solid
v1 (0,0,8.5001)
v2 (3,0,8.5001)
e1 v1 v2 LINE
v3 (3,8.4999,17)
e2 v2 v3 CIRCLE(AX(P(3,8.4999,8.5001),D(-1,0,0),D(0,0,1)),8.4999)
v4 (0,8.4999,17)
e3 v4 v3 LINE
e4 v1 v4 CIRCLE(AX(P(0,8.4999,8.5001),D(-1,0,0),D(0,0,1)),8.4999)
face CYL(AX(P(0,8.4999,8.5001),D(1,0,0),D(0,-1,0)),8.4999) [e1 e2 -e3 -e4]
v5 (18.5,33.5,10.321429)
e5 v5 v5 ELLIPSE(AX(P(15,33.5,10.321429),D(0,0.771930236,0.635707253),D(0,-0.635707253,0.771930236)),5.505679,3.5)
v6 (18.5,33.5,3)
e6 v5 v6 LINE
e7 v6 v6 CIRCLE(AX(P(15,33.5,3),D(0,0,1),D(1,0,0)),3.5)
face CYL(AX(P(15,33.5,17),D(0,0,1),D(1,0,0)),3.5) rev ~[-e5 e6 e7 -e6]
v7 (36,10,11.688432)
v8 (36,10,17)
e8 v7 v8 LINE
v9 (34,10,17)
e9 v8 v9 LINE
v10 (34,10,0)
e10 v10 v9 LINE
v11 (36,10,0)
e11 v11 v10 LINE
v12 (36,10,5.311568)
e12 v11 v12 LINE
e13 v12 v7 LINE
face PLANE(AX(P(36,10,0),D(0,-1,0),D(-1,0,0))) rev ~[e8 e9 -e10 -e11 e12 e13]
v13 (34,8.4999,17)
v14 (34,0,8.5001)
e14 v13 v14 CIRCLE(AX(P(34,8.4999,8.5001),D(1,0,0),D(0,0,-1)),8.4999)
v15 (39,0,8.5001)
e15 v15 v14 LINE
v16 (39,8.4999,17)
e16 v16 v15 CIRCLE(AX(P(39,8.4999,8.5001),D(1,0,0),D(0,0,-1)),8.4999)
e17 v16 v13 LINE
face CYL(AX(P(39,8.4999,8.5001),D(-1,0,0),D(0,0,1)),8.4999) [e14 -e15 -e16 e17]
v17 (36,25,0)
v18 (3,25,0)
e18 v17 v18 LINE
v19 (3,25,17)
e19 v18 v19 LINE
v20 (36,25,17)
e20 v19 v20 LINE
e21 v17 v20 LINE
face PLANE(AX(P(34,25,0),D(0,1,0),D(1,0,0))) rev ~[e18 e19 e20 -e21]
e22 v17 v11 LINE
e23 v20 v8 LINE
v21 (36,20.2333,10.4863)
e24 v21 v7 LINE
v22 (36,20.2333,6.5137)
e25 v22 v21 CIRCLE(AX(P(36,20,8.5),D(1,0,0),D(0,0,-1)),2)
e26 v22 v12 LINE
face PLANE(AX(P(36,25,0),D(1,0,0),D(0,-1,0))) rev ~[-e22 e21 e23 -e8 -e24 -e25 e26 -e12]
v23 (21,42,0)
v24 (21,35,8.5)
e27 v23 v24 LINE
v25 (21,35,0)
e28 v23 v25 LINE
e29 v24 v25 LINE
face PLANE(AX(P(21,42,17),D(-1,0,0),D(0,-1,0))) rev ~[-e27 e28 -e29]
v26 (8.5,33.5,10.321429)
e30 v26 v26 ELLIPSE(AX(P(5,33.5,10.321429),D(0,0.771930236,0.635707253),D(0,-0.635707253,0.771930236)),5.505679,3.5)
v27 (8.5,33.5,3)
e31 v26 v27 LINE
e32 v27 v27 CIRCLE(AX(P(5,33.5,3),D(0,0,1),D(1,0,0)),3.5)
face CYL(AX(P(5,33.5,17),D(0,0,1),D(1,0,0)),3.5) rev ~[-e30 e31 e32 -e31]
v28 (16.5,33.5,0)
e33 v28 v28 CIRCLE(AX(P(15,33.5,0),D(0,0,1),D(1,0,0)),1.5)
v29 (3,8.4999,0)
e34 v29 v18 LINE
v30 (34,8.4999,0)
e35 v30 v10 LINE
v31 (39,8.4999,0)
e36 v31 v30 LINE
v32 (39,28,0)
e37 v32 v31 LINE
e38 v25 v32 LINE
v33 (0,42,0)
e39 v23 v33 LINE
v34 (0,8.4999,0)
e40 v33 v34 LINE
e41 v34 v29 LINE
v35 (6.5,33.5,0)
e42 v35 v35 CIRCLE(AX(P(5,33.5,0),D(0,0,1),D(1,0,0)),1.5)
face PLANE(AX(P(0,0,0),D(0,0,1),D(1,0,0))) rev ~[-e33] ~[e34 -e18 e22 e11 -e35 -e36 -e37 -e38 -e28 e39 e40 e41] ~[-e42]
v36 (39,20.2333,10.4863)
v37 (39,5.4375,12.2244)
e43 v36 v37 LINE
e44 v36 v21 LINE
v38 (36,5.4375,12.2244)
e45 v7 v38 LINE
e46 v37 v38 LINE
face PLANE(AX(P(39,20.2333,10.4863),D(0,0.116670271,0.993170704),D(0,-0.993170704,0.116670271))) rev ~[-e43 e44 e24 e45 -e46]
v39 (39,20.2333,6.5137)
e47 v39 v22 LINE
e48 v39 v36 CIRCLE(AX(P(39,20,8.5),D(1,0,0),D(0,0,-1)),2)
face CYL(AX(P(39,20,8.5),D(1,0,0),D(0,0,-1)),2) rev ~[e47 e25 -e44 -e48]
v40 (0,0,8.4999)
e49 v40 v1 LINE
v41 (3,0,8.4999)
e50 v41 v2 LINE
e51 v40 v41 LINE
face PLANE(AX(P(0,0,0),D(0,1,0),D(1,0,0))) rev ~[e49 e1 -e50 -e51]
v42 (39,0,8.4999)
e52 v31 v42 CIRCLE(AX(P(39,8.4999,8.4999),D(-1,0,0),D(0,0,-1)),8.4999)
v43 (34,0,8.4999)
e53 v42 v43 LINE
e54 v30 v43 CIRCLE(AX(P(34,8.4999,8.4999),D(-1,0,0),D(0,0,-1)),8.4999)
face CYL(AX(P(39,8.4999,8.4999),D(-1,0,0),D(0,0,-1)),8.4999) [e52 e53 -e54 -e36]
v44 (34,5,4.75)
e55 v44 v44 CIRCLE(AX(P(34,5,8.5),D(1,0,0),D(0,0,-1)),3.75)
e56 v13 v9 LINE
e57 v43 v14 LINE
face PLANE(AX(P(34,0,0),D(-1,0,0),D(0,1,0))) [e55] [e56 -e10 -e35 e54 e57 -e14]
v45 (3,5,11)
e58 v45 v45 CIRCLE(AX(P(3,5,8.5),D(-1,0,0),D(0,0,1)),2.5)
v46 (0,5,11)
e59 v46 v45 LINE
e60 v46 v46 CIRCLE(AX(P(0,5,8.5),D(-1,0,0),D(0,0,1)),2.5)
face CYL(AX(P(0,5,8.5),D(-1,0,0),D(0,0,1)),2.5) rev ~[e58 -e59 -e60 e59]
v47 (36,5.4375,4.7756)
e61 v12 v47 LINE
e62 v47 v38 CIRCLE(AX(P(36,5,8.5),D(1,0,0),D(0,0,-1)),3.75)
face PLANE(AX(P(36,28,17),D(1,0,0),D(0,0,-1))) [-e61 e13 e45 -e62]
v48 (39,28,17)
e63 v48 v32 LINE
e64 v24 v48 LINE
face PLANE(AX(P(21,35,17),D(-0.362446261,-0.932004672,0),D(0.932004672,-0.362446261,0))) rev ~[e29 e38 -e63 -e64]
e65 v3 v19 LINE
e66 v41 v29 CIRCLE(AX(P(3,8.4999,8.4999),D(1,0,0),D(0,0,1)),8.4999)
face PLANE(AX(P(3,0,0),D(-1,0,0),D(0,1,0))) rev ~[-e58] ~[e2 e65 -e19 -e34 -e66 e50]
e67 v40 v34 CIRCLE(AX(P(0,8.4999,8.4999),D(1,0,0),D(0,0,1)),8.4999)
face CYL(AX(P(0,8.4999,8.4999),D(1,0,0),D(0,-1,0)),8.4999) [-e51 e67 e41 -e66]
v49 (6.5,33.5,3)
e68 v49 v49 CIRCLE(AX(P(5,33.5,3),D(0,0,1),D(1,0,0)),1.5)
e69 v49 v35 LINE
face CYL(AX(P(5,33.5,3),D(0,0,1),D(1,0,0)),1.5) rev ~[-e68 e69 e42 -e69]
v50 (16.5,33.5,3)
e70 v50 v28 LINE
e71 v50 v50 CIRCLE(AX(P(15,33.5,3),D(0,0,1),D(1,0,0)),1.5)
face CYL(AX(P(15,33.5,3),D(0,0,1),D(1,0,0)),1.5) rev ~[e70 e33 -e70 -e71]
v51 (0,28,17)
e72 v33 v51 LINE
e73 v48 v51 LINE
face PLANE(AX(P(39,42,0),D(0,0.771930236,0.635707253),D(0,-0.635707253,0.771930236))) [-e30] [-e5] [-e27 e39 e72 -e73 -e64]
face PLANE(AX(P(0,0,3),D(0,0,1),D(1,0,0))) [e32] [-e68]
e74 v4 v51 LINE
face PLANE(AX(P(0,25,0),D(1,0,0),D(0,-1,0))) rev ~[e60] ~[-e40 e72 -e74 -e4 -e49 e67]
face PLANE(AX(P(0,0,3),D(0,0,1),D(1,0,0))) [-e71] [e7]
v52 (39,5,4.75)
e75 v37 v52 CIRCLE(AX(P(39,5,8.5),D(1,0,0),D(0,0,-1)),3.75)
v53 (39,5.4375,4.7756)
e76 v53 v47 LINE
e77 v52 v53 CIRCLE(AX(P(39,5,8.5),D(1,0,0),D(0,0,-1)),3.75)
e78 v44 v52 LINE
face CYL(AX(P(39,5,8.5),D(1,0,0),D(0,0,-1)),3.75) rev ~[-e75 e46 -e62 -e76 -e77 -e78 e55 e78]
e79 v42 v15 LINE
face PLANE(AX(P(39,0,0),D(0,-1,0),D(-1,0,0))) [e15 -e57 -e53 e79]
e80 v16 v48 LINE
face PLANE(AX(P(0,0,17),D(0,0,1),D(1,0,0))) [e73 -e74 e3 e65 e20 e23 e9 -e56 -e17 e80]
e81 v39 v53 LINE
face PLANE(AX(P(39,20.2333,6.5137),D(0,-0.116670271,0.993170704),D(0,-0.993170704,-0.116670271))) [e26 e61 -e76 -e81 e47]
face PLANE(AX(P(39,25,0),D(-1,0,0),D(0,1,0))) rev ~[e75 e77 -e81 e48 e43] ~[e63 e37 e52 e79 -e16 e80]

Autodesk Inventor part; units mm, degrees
ref_plane "YZ Plane" through (0, 0, 0) normal (1, 0, 0) x (0, 1, 0)
ref_plane "XZ Plane" through (0, 0, 0) normal (0, 1, 0) x (-1, 0, 0)
ref_plane "XY Plane" through (0, 0, 0) normal (0, 0, 1) x (1, 0, 0)
sketch "Sketch1" plane through (0, 0, 0) normal (0, 0, 1) x (1, 0, 0)
  line L0 (0, 0) -> (3, 0)
  line L1 (3, 0) -> (3, 25)
  line L2 (3, 25) -> (0, 25)
  line L3 (0, 25) -> (0, 0)
  line L4 (34, 25) -> (39, 25)
  line L5 (39, 25) -> (39, 0)
  line L6 (39, 0) -> (34, 0)
  line L7 (34, 0) -> (34, 25)
  line L8 (0, 25) -> (39, 25)
  line L9 (39, 25) -> (39, 42)
  line L10 (39, 42) -> (0, 42)
  line L11 (0, 42) -> (0, 25)
  line L12 (34, 25) -> (36, 25)
  line L13 (36, 25) -> (36, 10)
  line L14 (36, 10) -> (34, 10)
  line L15 (34, 10) -> (34, 25)
  point P0 (3, 25)
  point P1 (34, 25)
  dimension "d0" = 3
  dimension "d1" = 25
  dimension "d2" = 5
  dimension "d3" = 25
  dimension "d4" = 31
  dimension "d5" = 39
  dimension "d6" = 17
  dimension "d70" = 2
  dimension "d71" = 15
extrude "Extrusion1" add sketch "Sketch1" along normal blind 17 contours L3 L2 L1 L0 | L11 L10 L9 L4 L8 L2 | L4 L5 L6 L7 L14 L13
sketch "Sketch2" plane through (39, 0, 0) normal (1, 0, 0) x (0, 0, -1)
  line L0 (-17, 28) -> (-17, 42)
  line L1 (0, 42) -> (-17, 42) projected
  line L2 (-17, 42) -> (0, 42)
  line L3 (0, 42) -> (-17, 28)
  point P0 (0, 0)
  dimension "d9" = 14
extrude "Extrusion2" cut sketch "Sketch2" against normal up to surface (39 mm away)
sketch "Sketch4" plane through (0, 0, 17) normal (0, 0, 1) x (1, 0, 0)
  line L0 (39, 0) -> (39, 42) projected
  line L1 (20, 42) -> (0, 42)
  line L2 (0, 42) -> (0, 25)
  line L3 (0, 25) -> (20, 25)
  line L4 (20, 25) -> (20, 42)
  circle A0 centre (15, 33.5) radius 3.5
  circle A1 centre (5, 33.5) radius 3.5
  line L5 (3, 25) -> (34, 25) projected
  line L6 (3, 25) -> (1, 25)
  point P0 (0, 0)
  dimension "d17" = 17
  dimension "d18" = 7
  dimension "d19" = 7
  dimension "d20" = 8.5
  dimension "d22" = 8.5
  dimension "d23" = 5
  dimension "d48" = 5
  dimension "d49" = 20
extrude "Extrusion4" cut sketch "Sketch4" against normal blind 14 contours A0 | A1
sketch "Sketch5" plane through (0, 0, 3) normal (0, 0, 1) x (1, 0, 0)
  arc A0 (15, 37) -> (15, 37) centre (15, 33.5) ccw projected
  circle A1 centre (15, 33.5) radius 1.5
  circle A2 centre (5, 33.5) radius 3.5 projected
  circle A3 centre (5, 33.5) radius 1.5
  point P0 (0, 0)
  point P1 (32.4191, 39.5294)
  point P2 (27.5809, 39.5294)
  point P3 (22.4191, 39.5294)
  point P4 (17.5809, 39.5294)
  dimension "d26" = 3
  dimension "d27" = 3
extrude "Extrusion5" cut sketch "Sketch5" against normal up to surface (3 mm away) contours A1 | A3
sketch "Sketch10" plane through (0, 0, 17) normal (0, 0, 1) x (1, 0, 0)
  line L0 (39, 42) -> (0, 42) projected
  line L1 (39, 42) -> (21, 42)
  line L2 (21, 42) -> (21, 35)
  line L3 (39, 28) -> (0, 28) projected
  line L4 (21, 35) -> (39, 28)
  line L5 (39, 42) -> (39, 28) projected
  line L6 (39, 28) -> (39, 42)
  point P0 (0, 0)
  dimension "d50" = 18
  dimension "d51" = 7
extrude "Extrusion10" cut sketch "Sketch10" against normal up to surface (17 mm away)
sketch "Sketch11" plane through (39, 0, 17) normal (1, 0, 0) x (0, 0, -1)
  circle A0 centre (8.5, 5) radius 3.75
  line L0 (17, 0) -> (0, 0) projected
  line L1 (17, 0) -> (17, 28) projected
  dimension "d54" = 7.5
  dimension "d55" = 5
  dimension "d56" = 8.5
extrude "Extrusion11" cut sketch "Sketch11" against normal up to surface (5 mm away)
sketch "Sketch12" plane through (0, 0, 0) normal (-1, 0, 0) x (0, 0, 1)
  circle A0 centre (8.5, 5) radius 2.5
  line L0 (0, 0) -> (17, 0) projected
  line L1 (17, 28) -> (17, 0) projected
  dimension "d59" = 5
  dimension "d60" = 5
  dimension "d61" = 8.5
extrude "Extrusion12" cut sketch "Sketch12" against normal up to surface (3 mm away)
fillet "Fillet2" radius 8.5 4 edges at (1.5, 0, 17) (1.5, 0, 0) (36.5, 0, 17) (36.5, 0, 0)
sketch "Sketch13" plane through (39, 28, 17) normal (1, 0, 0) x (0, 0, -1)
  circle A0 centre (8.5, -23) radius 3.75 projected
  circle A1 centre (8.5, -23) radius 3.5
  circle A2 centre (8.5, -8) radius 2
  circle A3 centre (8.5, -23) radius 3.75
  line L0 (10.4863, -7.7667) -> (12.2244, -22.5625)
  line L1 (6.5137, -7.7667) -> (4.7756, -22.5625)
  point P0 (17, -28)
  dimension "d65" = 4
  dimension "d66" = 15
  dimension "d67" = 0
extrude "Extrusion13" cut sketch "Sketch13" against normal blind 3 contours A0 | A0 L1 A2 L0 | A2 | A1
properties part number "juncao8"
